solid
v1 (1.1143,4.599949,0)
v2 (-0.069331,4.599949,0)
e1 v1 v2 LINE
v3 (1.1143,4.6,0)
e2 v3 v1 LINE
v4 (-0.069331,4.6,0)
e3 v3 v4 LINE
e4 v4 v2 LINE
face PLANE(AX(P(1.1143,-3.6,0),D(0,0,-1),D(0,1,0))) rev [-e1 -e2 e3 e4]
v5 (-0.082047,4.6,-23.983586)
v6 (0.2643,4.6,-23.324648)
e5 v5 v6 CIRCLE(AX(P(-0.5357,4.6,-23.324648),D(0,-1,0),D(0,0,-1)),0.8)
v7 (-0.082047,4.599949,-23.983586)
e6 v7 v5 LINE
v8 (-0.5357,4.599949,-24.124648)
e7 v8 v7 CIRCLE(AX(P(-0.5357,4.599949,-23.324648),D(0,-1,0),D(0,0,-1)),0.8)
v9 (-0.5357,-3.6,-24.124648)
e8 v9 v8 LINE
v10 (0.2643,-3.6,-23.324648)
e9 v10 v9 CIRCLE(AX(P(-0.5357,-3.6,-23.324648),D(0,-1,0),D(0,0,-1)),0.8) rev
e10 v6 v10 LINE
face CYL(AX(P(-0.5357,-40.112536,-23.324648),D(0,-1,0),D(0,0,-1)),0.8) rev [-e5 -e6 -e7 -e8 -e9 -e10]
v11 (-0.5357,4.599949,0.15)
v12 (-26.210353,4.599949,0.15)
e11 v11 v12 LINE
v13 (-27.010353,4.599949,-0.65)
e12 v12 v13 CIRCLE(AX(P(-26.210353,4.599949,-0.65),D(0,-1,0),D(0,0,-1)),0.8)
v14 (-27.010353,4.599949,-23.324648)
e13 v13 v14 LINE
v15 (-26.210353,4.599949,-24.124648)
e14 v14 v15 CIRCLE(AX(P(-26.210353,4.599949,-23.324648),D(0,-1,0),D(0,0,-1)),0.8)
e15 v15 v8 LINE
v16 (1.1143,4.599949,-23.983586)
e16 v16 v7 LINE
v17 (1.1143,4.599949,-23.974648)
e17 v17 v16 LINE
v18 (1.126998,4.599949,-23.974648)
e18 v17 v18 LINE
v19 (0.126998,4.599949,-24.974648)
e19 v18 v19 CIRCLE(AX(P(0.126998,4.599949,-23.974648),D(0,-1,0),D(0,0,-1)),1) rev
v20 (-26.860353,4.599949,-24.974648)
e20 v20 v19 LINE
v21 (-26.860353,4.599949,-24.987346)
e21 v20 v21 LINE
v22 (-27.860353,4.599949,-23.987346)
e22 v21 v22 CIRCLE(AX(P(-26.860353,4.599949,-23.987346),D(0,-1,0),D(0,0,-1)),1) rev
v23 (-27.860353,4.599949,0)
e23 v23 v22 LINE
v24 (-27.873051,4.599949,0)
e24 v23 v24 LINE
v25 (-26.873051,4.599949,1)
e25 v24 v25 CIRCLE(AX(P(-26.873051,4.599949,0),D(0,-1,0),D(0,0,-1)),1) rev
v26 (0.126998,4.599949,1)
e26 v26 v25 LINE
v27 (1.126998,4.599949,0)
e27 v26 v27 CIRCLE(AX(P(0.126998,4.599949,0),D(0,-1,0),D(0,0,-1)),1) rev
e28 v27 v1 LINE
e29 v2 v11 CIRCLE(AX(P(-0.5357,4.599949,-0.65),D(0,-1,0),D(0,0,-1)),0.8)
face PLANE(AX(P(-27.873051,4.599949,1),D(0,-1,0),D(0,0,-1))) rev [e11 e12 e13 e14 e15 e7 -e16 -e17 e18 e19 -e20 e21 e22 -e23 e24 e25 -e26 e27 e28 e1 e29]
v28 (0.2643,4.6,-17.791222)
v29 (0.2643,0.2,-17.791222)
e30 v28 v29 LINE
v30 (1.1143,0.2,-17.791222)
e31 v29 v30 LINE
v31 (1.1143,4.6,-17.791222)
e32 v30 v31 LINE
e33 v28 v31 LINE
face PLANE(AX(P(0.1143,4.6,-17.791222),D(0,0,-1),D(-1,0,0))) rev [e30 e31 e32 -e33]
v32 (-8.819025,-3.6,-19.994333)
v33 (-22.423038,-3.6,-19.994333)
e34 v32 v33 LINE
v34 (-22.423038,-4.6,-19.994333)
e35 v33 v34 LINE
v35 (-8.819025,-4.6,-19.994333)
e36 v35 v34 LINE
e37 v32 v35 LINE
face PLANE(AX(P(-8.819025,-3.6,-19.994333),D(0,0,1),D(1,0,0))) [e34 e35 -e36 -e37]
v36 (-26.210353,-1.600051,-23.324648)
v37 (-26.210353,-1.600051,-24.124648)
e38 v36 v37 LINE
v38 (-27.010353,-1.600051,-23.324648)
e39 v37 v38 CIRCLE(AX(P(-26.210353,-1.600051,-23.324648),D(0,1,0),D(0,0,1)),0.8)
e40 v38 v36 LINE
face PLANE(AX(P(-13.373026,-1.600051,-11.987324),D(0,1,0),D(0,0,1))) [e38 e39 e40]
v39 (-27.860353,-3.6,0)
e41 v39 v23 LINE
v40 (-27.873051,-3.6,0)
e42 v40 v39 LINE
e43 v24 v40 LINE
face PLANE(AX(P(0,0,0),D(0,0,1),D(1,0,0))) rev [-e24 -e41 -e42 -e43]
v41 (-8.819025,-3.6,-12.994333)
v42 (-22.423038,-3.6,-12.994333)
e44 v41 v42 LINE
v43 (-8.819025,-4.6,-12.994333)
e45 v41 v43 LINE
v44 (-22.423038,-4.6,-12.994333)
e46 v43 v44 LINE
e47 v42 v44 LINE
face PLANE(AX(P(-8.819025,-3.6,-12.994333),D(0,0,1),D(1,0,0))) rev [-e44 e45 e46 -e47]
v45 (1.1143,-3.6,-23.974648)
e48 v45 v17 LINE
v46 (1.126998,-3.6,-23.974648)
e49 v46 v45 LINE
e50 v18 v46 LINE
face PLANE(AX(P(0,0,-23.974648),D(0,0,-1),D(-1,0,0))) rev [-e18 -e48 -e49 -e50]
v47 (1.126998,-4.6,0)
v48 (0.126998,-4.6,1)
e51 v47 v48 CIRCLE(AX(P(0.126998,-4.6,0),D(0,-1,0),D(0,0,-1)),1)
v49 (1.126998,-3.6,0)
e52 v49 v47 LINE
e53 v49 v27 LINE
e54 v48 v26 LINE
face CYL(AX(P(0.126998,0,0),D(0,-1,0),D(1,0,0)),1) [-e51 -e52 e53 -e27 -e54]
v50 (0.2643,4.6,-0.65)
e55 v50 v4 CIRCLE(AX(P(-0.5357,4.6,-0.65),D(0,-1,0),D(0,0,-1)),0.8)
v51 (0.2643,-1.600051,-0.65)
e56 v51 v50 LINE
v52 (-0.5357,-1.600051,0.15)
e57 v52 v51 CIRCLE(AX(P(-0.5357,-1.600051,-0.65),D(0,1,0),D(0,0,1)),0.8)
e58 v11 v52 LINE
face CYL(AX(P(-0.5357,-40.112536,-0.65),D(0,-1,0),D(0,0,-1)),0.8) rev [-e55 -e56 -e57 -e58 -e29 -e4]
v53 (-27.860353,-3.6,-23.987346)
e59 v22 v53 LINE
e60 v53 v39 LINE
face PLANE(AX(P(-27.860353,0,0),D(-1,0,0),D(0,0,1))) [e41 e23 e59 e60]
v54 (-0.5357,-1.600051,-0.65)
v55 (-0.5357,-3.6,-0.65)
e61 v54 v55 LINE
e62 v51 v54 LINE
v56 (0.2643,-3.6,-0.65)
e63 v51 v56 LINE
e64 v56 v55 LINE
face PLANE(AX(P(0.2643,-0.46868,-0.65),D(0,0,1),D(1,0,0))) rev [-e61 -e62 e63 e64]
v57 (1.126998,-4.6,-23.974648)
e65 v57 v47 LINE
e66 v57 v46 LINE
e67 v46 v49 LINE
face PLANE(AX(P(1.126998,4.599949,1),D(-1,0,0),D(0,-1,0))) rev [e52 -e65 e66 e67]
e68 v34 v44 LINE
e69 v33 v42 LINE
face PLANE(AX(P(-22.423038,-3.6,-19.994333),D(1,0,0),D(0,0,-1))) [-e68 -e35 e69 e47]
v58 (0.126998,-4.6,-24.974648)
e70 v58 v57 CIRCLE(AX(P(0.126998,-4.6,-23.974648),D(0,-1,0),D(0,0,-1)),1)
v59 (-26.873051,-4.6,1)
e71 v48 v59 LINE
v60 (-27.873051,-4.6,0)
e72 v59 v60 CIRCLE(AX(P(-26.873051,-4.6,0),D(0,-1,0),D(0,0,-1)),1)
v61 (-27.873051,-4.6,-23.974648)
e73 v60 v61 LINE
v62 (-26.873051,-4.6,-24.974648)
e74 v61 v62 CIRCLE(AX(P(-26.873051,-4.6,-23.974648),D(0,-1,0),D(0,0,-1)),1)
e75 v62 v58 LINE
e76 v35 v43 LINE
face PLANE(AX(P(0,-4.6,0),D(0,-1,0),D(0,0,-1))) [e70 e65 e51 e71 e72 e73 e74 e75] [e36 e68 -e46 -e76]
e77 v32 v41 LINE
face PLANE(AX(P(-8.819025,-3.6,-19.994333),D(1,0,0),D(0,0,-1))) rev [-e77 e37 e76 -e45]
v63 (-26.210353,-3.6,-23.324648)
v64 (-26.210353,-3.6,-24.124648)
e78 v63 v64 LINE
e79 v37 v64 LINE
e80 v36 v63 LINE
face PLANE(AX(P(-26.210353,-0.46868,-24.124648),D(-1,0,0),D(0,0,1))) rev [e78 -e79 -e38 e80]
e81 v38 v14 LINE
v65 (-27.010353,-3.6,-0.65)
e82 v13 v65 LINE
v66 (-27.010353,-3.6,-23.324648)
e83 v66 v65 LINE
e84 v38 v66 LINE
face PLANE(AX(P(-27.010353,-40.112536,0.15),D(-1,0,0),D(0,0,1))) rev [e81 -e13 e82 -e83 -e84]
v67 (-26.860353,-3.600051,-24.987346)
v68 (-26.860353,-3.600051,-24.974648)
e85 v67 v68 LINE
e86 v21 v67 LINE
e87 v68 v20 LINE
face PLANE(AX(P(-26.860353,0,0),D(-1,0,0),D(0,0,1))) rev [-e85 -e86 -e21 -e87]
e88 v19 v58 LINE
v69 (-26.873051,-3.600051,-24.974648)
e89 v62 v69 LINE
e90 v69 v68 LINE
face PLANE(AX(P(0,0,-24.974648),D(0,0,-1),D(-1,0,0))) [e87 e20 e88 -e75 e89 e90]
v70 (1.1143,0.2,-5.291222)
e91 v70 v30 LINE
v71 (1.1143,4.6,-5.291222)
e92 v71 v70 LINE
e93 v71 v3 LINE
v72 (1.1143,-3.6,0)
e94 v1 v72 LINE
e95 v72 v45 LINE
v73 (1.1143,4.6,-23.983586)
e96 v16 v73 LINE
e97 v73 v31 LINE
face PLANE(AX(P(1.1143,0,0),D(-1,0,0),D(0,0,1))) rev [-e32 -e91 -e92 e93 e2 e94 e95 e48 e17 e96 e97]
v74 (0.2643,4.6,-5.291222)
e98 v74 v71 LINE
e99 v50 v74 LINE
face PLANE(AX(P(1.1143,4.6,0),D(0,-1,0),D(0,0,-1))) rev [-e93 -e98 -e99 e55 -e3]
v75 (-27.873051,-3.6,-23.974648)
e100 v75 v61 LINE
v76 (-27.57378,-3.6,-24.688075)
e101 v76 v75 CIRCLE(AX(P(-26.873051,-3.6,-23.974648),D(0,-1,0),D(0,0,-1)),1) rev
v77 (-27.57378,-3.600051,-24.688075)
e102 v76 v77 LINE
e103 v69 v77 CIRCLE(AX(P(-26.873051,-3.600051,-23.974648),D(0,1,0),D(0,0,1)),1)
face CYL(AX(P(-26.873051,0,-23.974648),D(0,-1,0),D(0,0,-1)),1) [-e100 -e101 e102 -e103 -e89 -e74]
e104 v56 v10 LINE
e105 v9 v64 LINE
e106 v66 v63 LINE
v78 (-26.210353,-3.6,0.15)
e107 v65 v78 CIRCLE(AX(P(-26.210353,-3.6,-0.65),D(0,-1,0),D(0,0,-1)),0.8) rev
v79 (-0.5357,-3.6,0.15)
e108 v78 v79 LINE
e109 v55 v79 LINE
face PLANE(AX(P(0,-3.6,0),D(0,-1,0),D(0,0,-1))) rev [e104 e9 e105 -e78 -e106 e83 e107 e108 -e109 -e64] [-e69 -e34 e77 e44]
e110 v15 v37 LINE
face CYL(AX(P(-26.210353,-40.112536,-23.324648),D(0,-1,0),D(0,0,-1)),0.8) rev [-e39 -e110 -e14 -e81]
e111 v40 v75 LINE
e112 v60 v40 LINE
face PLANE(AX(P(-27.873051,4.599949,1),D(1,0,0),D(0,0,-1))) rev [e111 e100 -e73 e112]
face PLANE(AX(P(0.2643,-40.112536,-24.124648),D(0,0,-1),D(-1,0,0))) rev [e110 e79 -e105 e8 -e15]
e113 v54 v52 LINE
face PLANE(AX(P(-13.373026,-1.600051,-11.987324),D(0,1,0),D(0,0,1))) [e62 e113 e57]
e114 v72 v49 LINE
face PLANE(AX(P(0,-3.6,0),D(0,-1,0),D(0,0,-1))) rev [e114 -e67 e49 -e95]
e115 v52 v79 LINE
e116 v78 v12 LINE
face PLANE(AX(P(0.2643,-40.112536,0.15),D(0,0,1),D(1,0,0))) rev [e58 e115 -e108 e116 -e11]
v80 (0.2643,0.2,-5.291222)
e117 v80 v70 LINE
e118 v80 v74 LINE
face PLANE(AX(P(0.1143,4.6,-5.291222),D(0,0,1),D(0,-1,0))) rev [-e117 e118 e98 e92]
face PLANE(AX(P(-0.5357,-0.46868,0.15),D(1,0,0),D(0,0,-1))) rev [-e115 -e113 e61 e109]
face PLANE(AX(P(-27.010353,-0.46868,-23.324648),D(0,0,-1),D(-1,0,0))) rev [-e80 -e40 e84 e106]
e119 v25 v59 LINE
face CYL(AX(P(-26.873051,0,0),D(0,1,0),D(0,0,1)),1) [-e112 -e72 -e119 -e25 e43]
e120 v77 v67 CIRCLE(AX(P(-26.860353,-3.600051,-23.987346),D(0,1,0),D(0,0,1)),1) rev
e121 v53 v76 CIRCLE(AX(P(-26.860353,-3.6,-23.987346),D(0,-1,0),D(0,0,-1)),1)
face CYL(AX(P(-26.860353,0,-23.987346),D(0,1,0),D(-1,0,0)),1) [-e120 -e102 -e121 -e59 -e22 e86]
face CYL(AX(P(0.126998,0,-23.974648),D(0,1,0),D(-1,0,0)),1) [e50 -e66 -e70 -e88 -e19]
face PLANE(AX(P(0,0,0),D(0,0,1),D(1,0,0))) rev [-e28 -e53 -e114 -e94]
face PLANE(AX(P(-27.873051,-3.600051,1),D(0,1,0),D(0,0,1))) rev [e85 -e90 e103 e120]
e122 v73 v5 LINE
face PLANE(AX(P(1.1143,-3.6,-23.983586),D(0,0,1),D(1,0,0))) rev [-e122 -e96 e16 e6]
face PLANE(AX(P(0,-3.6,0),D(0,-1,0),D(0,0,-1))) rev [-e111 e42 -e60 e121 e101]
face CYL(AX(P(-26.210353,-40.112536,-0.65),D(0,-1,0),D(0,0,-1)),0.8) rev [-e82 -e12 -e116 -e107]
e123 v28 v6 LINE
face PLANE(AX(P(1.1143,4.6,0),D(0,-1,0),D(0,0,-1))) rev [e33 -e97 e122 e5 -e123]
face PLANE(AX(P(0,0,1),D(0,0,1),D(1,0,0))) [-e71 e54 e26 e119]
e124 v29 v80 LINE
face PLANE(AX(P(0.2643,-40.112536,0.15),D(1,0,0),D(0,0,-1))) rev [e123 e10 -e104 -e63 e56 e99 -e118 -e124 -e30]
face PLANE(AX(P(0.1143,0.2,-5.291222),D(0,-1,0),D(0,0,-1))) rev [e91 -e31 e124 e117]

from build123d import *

# Parameters (mm, degrees)
SKETCH_1_W          = 29.00004826
SKETCH_1_H          = 8.2
EXTRUDE_1_DEPTH     = 1
SKETCH_3_W          = 24.987345695
SKETCH_3_H          = 8.2
EXTRUDE_2_DEPTH     = 1
SKETCH_4_W          = 27.987350775
SKETCH_4_H          = 8.2
EXTRUDE_3_DEPTH     = 1
SKETCH_6_W          = 23.983586282
SKETCH_6_H          = 8.2
EXTRUDE_4_DEPTH     = 1
SKETCH_9_W          = 12.5
SKETCH_9_H          = 4.4
CUT_EXTRUDE_1_DEPTH = 1
SKETCH_10_W         = 29.00004826
SKETCH_10_H         = 25.974648209
EXTRUDE_5_DEPTH     = 1
SKETCH_11_W         = 13.604013208
SKETCH_11_H         = 7
CUT_EXTRUDE_3_DEPTH = 1
FILLET_1_R          = 1
FILLET_2_R          = 1
CUT_EXTRUDE_START   = -8.200051
SKETCH_12_W         = 27.27465329
SKETCH_12_H         = 24.274648209
SKETCH_12_W_2       = 26.97465329
SKETCH_12_H_2       = 23.974648209
CUT_EXTRUDE_4_DEPTH = 8.200051
EXTRUDE_START       = -5.1e-05
SKETCH_14_W         = 0.8
SKETCH_14_H         = 0.8
EXTRUDE_6_DEPTH     = 2
FILLET_3_R          = 0.8


# Some blends are built 0.0001 mm under size
with BuildPart() as part:
    # 草图1 → 凸台-拉伸1 (new body)
    with BuildSketch(Plane.XY):
        with Locations((-13.373026416, 0.4999492)):
            Rectangle(SKETCH_1_W, SKETCH_1_H)
    extrude(amount=EXTRUDE_1_DEPTH)

    # 草图3 → 凸台-拉伸2 (add)
    with BuildSketch(Plane.ZY.offset(26.860353061)):
        with Locations((-12.493672848, 0.4999492)):
            Rectangle(SKETCH_3_W, SKETCH_3_H)
    extrude(amount=EXTRUDE_2_DEPTH)

    # 草图4 → 凸台-拉伸3 (add)
    with BuildSketch(Plane(origin=(0, 0, -23.974648209), x_dir=(-1, 0, 0), z_dir=(0, 0, -1))):
        with Locations((12.866677673, 0.4999492)):
            Rectangle(SKETCH_4_W, SKETCH_4_H)
    extrude(amount=EXTRUDE_3_DEPTH)

    # 草图6 → 凸台-拉伸4 (add)
    with BuildSketch(Plane(origin=(0.114300229, 0, 0), x_dir=(0, 0, -1), z_dir=(1, 0, 0))):
        with Locations((11.991793141, 0.5)):
            Rectangle(SKETCH_6_W, SKETCH_6_H)
    extrude(amount=EXTRUDE_4_DEPTH)

    # 草图9 → 切除-拉伸1 (cut)
    with BuildSketch(Plane(origin=(1.114300229, 0, 0), x_dir=(0, 0, -1), z_dir=(1, 0, 0))):
        with Locations((11.541221742, 2.4)):
            Rectangle(SKETCH_9_W, SKETCH_9_H)
    extrude(amount=-CUT_EXTRUDE_1_DEPTH, mode=Mode.SUBTRACT)

    # 草图10 → 凸台-拉伸5 (add)
    with BuildSketch(Plane.XZ.offset(3.6)):
        with Locations((-13.373026416, -11.987324105)):
            Rectangle(SKETCH_10_W, SKETCH_10_H)
    extrude(amount=EXTRUDE_5_DEPTH)

    # 草图11 → 切除-拉伸3 (cut)
    with BuildSketch(Plane.XZ.offset(4.6)):
        with Locations((-15.621031242, -16.494333249)):
            Rectangle(SKETCH_11_W, SKETCH_11_H)
    extrude(amount=-CUT_EXTRUDE_3_DEPTH, mode=Mode.SUBTRACT)

    # 圆角1
    fillet_1_edges = [part.edges().sort_by_distance(p)[0] for p in [
        (1.126997714, -2.54e-05, -24.974648209),
        (1.126997714, -2.54e-05, 1),
        (-27.873050546, -2.54e-05, 1),
        (-27.873050546, -4.1, -24.974648209),
    ]]
    fillet(fillet_1_edges, radius=FILLET_1_R)

    # 圆角2
    fillet_2_edges = [part.edges().sort_by_distance(p)[0] for p in [
        (-27.860353061, 0.4999492, -24.987345695),
    ]]
    fillet(fillet_2_edges, radius=FILLET_2_R - 0.0001)  # a hair under: the kernel refuses the full size

    # 草图12 → 切除-拉伸4 (cut)
    with BuildSketch(Plane(origin=(0, 4.6, 0), x_dir=(1, 0, 0), z_dir=(0, 1, 0)).offset(CUT_EXTRUDE_START)):
        with Locations((-13.373026416, 11.987324105)):
            Rectangle(SKETCH_12_W, SKETCH_12_H)
        with Locations((-13.373026416, 11.987324105)):
            Rectangle(SKETCH_12_W_2, SKETCH_12_H_2, mode=Mode.SUBTRACT)
    extrude(amount=CUT_EXTRUDE_4_DEPTH, mode=Mode.SUBTRACT)

    # 草图14 → 凸台-拉伸6 (add)
    with BuildSketch(Plane(origin=(0, -3.6, 0), x_dir=(1, 0, 0), z_dir=(0, 1, 0)).offset(EXTRUDE_START)):
        with Locations((-26.610353061, 23.724648209)):
            Rectangle(SKETCH_14_W, SKETCH_14_H)
        with Locations((-0.135699771, 0.25)):
            Rectangle(SKETCH_14_W, SKETCH_14_H)
    extrude(amount=EXTRUDE_6_DEPTH)

    # 圆角3
    # the kernel refuses this fillet: 0.8 mm, written as the material it adds along each edge
    with BuildSketch(Plane(origin=(-27.010353061, -3.600051, 0.15), x_dir=(0, 0, -1), z_dir=(0, 1, 0)), Plane(origin=(-27.010353061, -3.600051, -24.124648209), x_dir=(1, 0, 0), z_dir=(0, 1, 0))) as fillet_3_piece_1:
        with BuildLine():
            CenterArc((FILLET_3_R, -FILLET_3_R), FILLET_3_R, 90, 90)
            Line((0, -FILLET_3_R), (0, 0))
            Line((0, 0), (FILLET_3_R, 0))
        make_face()
    extrude(amount=8.2000002)
    with BuildSketch(Plane(origin=(0.264300229, -3.600051, 0.15), x_dir=(0, 0, -1), z_dir=(0, 1, 0))) as fillet_3_piece_2_section:
        with BuildLine():
            CenterArc((FILLET_3_R, FILLET_3_R), FILLET_3_R, 180, 90)
            Line((0, FILLET_3_R), (0, 0))
            Line((0, 0), (FILLET_3_R, 0))
        make_face()
    fillet_3_piece_2 = extrude(amount=10.2000002, mode=Mode.PRIVATE)
    fillet_3_piece_2 = split(fillet_3_piece_2, bisect_by=Plane(origin=(0.183426008, 4.6, -0.178427163), z_dir=(0, -1, 0)), keep=Keep.TOP, mode=Mode.PRIVATE)
    add(fillet_3_piece_2)
    with BuildSketch(Plane(origin=(0.264300229, -3.600051, -24.124648209), x_dir=(0, 0, 1), z_dir=(0, 1, 0))) as fillet_3_piece_3_section:
        with BuildLine():
            CenterArc((FILLET_3_R, -FILLET_3_R), FILLET_3_R, 90, 90)
            Line((0, -FILLET_3_R), (0, 0))
            Line((0, 0), (FILLET_3_R, 0))
        make_face()
    fillet_3_piece_3 = extrude(amount=10.2000002, mode=Mode.PRIVATE)
    fillet_3_piece_3 = split(fillet_3_piece_3, bisect_by=Plane(origin=(0.180139074, 4.6, -23.803633202), z_dir=(0, -1, 0)), keep=Keep.TOP, mode=Mode.PRIVATE)
    add(fillet_3_piece_3)


solid = part.part
